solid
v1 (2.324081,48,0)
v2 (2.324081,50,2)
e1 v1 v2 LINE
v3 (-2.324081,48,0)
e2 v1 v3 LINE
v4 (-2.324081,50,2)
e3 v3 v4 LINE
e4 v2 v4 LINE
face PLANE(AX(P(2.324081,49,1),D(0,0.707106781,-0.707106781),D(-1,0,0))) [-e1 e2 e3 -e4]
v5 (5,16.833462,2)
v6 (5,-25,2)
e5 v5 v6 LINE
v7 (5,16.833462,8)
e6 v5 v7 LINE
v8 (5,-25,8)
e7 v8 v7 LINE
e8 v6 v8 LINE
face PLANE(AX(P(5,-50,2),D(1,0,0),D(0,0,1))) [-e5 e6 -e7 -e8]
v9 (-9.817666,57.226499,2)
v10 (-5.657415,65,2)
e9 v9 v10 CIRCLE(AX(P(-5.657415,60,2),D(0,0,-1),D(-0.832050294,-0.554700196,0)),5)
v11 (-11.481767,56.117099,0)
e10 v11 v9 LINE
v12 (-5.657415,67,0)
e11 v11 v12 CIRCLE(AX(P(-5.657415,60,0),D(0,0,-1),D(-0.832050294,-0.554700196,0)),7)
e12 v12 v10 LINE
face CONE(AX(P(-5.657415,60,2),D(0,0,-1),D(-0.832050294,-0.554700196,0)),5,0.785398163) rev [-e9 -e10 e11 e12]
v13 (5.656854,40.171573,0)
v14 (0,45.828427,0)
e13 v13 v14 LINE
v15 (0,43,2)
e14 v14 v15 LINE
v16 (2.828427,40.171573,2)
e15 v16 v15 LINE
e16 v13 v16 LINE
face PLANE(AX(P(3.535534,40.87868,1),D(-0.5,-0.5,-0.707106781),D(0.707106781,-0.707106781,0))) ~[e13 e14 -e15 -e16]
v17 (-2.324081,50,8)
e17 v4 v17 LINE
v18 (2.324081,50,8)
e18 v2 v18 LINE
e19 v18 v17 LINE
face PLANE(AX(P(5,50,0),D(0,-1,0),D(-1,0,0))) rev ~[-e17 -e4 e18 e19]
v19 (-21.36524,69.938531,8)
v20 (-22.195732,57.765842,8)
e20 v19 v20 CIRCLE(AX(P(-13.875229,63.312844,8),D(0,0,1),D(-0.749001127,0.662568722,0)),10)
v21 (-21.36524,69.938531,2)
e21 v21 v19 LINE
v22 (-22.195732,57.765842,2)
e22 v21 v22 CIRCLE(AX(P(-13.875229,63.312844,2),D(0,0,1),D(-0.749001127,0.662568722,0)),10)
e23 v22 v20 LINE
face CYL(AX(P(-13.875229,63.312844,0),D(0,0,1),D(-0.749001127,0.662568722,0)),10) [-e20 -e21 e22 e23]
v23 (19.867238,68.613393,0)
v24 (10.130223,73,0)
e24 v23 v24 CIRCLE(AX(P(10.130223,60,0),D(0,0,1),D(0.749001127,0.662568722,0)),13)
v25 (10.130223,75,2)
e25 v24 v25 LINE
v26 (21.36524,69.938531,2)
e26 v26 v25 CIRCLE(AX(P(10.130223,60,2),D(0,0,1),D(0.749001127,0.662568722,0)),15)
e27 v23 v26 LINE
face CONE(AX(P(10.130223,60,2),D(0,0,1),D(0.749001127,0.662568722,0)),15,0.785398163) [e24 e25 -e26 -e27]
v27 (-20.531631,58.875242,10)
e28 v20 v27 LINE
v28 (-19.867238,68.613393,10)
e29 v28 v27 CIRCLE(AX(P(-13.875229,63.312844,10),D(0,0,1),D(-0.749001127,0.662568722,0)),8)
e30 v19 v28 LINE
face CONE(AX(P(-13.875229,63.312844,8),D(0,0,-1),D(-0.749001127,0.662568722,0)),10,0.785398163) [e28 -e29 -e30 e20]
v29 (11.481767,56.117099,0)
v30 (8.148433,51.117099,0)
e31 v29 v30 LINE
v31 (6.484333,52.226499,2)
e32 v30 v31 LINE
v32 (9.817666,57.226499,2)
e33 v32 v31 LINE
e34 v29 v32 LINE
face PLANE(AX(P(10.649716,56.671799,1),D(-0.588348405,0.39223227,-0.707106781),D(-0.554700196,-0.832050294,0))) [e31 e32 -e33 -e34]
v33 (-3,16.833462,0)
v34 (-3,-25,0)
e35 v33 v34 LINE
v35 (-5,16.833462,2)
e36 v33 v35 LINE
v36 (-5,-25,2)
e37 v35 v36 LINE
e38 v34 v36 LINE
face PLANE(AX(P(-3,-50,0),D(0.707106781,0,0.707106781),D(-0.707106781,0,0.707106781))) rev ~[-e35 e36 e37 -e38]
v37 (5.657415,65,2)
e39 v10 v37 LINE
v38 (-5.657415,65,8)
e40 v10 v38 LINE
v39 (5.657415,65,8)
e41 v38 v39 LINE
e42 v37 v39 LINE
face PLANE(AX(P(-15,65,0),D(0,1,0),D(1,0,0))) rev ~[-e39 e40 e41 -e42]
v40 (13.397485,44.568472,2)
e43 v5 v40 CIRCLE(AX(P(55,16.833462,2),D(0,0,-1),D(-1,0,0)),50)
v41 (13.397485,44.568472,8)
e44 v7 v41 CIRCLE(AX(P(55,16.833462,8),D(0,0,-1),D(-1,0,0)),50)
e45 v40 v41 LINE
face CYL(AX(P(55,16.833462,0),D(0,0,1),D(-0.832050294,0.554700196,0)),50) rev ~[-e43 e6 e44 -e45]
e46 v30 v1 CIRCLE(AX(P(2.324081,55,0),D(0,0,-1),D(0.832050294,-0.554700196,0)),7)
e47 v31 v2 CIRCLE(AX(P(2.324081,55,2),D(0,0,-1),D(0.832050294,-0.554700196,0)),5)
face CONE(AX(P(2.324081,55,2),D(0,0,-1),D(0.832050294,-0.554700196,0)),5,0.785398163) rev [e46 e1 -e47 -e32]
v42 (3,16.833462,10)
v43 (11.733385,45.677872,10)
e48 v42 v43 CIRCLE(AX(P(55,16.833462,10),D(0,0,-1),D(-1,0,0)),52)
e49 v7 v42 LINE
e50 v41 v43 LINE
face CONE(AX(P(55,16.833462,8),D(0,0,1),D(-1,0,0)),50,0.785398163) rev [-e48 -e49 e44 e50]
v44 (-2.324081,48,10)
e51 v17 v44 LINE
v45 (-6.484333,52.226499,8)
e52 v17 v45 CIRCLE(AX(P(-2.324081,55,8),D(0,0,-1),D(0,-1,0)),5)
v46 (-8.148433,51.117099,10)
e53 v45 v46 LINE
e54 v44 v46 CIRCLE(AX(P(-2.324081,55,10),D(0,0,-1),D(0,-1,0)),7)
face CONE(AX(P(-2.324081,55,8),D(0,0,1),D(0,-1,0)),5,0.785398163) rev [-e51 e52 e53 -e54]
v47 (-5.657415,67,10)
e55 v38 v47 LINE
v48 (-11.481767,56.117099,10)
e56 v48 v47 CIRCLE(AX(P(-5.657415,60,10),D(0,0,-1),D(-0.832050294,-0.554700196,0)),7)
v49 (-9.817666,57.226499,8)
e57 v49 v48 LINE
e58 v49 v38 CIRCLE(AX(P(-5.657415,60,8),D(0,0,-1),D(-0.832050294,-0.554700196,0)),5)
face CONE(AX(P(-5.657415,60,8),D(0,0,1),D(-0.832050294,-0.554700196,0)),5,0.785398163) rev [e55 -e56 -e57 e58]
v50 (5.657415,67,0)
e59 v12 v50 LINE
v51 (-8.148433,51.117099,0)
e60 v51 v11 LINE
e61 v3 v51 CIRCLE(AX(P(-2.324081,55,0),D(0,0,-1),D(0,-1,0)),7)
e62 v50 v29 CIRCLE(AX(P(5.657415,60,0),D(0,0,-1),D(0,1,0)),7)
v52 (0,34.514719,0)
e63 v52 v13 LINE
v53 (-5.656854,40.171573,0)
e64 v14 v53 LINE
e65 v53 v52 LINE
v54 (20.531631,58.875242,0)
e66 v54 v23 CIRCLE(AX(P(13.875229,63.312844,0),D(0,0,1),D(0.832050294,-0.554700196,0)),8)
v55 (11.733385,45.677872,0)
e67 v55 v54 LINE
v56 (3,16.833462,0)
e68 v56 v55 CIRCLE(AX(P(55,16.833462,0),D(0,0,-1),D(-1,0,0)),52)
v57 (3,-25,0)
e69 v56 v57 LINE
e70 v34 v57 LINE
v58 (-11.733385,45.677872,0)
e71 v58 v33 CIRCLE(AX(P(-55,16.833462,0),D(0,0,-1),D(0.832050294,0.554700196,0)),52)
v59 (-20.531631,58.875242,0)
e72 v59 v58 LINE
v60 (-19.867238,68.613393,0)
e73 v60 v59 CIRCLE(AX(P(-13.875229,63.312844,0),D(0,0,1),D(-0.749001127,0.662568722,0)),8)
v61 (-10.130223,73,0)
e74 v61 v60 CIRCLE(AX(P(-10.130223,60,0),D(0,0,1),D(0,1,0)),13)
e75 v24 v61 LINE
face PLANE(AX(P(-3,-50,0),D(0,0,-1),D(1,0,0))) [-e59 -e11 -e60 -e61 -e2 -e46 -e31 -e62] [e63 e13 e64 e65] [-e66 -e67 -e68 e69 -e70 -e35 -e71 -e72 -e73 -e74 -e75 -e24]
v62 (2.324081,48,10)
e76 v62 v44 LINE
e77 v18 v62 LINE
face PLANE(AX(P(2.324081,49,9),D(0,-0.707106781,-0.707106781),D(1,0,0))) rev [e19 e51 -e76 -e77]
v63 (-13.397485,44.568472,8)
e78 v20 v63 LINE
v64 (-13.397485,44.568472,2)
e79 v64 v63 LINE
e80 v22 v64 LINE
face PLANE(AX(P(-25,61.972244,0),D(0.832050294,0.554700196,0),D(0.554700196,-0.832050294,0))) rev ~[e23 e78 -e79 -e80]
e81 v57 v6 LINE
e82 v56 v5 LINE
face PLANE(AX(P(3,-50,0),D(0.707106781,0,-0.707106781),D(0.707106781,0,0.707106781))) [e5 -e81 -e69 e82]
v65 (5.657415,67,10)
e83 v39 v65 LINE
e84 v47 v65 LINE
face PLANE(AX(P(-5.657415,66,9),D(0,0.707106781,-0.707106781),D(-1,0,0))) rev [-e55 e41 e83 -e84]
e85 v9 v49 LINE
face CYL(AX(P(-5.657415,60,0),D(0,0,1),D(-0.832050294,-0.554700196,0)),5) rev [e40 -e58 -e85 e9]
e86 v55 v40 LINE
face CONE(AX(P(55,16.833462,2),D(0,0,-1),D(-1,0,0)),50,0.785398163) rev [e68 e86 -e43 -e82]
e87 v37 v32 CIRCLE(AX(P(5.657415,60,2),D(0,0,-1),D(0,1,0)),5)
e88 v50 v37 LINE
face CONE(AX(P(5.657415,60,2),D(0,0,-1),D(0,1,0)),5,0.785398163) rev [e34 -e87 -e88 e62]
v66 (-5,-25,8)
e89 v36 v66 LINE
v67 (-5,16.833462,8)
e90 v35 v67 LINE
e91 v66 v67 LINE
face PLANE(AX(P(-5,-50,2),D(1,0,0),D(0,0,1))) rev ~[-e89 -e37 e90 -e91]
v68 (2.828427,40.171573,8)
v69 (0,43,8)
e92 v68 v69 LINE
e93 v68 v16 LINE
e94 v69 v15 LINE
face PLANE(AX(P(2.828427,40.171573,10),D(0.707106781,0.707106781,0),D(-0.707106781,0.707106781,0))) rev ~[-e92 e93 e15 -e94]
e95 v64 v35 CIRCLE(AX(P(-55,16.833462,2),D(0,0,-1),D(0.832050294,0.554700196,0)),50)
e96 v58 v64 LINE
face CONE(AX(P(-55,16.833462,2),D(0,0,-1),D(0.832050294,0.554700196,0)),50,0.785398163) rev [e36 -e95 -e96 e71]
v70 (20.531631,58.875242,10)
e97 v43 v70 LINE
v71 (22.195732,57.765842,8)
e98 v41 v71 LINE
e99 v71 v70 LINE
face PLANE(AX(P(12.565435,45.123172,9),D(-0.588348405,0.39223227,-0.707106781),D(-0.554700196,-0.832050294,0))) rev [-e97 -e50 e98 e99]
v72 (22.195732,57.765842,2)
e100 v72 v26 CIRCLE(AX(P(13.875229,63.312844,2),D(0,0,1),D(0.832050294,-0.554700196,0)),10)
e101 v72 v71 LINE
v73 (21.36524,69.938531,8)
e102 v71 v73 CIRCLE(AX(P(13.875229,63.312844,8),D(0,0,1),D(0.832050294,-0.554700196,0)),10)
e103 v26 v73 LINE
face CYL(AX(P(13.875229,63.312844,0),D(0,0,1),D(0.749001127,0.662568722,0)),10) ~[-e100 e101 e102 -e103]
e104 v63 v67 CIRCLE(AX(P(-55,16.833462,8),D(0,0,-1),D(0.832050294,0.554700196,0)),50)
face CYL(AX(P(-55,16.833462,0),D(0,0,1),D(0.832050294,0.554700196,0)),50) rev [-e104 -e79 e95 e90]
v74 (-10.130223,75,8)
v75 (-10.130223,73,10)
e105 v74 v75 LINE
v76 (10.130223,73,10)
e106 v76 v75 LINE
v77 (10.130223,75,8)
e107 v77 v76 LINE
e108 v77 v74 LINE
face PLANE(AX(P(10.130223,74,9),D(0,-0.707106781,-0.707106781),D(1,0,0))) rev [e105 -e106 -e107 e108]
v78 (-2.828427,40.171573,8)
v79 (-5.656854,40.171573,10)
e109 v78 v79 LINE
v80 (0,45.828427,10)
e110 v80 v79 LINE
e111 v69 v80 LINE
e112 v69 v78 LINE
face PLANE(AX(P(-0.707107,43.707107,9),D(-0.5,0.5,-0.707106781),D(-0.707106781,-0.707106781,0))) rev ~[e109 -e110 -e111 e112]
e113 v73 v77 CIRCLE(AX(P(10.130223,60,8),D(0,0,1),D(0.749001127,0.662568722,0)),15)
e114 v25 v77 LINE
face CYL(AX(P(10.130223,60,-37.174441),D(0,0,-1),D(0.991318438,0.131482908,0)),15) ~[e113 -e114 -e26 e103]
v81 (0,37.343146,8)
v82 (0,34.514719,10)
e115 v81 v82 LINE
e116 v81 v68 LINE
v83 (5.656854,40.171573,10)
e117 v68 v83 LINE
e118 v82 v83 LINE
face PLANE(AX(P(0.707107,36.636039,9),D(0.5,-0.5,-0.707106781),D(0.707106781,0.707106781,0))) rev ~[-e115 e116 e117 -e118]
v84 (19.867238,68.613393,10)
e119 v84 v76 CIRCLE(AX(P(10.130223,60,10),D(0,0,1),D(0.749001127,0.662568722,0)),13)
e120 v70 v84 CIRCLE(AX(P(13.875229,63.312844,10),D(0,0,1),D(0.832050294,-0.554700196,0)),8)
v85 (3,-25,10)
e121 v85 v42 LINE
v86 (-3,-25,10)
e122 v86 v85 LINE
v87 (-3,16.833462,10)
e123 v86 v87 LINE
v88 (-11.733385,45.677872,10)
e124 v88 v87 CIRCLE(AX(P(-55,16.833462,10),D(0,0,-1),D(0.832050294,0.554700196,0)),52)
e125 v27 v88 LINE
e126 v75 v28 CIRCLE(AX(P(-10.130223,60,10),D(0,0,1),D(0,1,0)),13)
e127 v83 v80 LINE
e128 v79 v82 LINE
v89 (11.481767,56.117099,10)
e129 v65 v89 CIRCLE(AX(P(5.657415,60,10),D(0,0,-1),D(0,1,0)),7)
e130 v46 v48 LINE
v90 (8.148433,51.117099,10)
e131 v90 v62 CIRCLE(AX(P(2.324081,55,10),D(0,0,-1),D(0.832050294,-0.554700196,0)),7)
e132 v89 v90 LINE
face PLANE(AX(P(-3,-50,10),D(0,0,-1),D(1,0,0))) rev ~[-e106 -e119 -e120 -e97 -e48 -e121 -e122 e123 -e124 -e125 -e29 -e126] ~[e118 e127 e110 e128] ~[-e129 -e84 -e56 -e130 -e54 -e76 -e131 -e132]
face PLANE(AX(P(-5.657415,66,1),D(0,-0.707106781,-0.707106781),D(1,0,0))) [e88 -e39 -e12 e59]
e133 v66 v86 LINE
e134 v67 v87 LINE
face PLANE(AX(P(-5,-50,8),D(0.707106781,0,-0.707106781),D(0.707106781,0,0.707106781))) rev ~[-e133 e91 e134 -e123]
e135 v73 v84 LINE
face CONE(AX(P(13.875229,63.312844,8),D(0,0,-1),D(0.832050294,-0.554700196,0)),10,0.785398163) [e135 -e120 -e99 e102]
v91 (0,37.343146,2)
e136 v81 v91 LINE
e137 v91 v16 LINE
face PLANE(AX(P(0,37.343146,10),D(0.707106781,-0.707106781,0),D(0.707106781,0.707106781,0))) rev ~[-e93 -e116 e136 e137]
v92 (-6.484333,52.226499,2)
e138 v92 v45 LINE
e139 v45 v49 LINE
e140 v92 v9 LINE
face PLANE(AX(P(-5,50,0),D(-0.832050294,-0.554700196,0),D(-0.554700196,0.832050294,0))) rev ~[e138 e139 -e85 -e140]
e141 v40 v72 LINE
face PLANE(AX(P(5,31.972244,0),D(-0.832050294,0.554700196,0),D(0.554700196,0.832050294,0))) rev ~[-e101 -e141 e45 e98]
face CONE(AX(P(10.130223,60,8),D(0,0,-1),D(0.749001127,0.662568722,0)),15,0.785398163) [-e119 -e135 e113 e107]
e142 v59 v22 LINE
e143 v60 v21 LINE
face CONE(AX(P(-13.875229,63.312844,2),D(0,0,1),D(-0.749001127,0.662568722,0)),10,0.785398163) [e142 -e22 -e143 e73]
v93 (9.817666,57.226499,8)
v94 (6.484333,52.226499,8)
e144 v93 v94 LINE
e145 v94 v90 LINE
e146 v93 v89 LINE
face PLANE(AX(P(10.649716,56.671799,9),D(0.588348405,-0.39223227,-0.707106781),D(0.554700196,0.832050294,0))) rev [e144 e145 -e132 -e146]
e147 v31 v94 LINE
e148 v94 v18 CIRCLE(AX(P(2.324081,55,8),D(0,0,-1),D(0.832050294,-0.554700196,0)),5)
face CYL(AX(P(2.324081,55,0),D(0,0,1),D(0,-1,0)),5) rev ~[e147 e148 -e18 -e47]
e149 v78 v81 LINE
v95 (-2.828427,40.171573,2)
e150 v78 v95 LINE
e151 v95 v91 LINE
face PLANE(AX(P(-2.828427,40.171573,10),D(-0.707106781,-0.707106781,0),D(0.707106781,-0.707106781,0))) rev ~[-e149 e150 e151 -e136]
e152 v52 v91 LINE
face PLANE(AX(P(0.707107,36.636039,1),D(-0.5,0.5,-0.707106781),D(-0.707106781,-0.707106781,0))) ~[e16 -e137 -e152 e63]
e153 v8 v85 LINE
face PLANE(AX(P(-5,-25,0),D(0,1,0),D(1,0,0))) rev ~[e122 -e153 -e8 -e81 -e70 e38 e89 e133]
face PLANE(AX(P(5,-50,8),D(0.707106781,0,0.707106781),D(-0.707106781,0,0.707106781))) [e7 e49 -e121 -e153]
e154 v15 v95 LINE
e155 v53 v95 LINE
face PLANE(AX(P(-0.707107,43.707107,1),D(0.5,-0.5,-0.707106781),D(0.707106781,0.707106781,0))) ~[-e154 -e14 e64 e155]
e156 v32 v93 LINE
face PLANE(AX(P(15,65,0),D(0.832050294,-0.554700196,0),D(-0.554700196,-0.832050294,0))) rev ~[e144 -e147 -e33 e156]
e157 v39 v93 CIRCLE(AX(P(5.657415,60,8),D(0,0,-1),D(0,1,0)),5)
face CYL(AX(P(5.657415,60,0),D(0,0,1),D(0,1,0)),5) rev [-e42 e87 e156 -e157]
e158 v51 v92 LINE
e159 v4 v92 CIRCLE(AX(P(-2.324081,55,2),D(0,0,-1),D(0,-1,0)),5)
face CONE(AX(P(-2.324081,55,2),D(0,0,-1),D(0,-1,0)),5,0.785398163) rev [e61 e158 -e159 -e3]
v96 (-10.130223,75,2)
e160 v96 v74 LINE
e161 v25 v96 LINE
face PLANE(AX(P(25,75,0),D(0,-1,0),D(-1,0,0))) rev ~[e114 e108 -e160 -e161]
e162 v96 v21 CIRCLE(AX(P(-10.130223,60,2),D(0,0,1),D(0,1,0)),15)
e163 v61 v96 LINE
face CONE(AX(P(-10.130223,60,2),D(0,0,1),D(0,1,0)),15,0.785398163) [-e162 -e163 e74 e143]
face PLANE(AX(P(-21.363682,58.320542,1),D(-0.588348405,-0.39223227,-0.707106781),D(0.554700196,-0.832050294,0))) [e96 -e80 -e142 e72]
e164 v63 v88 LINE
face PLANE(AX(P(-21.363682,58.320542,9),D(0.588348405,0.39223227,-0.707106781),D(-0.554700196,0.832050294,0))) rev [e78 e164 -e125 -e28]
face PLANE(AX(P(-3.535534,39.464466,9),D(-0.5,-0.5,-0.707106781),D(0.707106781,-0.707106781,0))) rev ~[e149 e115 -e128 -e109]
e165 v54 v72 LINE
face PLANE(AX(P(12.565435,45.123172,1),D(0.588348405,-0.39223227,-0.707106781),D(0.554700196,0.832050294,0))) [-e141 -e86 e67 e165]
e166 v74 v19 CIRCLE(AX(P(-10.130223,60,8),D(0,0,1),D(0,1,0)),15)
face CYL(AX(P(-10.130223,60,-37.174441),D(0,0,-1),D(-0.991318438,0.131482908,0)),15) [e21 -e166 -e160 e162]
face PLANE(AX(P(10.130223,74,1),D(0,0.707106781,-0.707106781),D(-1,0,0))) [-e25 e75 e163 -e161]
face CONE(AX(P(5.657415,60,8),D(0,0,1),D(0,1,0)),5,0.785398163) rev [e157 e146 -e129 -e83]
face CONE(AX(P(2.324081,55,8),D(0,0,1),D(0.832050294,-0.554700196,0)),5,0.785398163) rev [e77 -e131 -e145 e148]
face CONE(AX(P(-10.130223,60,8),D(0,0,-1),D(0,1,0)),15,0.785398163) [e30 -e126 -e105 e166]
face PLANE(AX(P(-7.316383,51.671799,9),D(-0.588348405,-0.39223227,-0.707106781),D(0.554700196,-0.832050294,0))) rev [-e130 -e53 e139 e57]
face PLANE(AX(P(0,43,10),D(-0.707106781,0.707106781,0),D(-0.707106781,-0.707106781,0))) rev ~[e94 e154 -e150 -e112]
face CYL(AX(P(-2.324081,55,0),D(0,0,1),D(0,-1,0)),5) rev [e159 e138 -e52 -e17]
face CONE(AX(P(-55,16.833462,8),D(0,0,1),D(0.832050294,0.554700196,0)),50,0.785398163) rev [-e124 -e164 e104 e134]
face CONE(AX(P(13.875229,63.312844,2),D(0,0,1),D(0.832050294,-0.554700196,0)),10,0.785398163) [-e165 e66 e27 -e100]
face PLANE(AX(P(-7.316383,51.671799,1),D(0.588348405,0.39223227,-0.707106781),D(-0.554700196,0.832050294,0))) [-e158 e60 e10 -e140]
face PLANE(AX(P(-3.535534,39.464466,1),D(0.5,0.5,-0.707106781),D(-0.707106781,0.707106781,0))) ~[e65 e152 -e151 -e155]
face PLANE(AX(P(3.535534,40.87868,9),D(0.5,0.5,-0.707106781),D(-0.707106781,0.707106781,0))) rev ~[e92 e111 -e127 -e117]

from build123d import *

# Parameters (mm, degrees)
F0_W        = 30
F0_H        = 10
F1_DEPTH    = 10
F2_R        = 5
F3_T1_DEPTH = 84.348882825
F4_R        = 10
F5_R        = 50
F6_SIZE     = 2
F8_DEPTH    = 10.001
F9_SIZE     = 2
F10_DEPTH   = 16
F11_DEPTH   = 25


# Not quite as in the source:
# - a fillet or chamfer that OpenCascade refuses, or shapes differently, is made with other operations: its cross-section is extruded or revolved along the edge and cut away or added


with BuildPart() as f1:
    # F0 (on Top) → F1 (new body)
    with BuildSketch(Plane.XY):
        Polygon((5, 50), (-5, 50), (-15, 65), (-15, 75), (-25, 75), (-25, 61.9722436227), (-5, 31.9722436227), (-5, -50), (5, -50), (5, 31.9722436227), (25, 61.9722436227), (25, 75), (15, 75), (15, 65), align=None)
        with Locations((0, 70)):
            Rectangle(F0_W, F0_H)
    extrude(amount=F1_DEPTH)

    # F2
    f2_edges = [f1.edges().sort_by_distance(p)[0] for p in [
        (15, 65, 5),
        (-15, 65, 5),
        (-5, 50, 5),
        (5, 50, 5),
    ]]
    fillet(f2_edges, radius=F2_R)

    # F3: fillet of radius 15 on 2 edges, made by hand

    # F3_s2 → F3_t1 (cut)
    with BuildSketch(Plane.XY.offset(-37.1744414125)):
        with BuildLine():
            ThreePointArc((-25, 61.9722436227), (-20.0149678844, 71.2823679771), (-10.130223435, 75))
            Line((-10.130223435, 75), (-25, 75))
            Line((-25, 75), (-25, 61.9722436227))
        make_face()
        with BuildLine():
            ThreePointArc((25, 61.9722436227), (20.0149678844, 71.2823679771), (10.130223435, 75))
            Line((10.130223435, 75), (25, 75))
            Line((25, 75), (25, 61.9722436227))
        make_face()
    extrude(amount=F3_T1_DEPTH, mode=Mode.SUBTRACT)

    # F4
    f4_edges = [f1.edges().sort_by_distance(p)[0] for p in [
        (-25, 61.972244, 5),
        (25, 61.972244, 5),
    ]]
    fillet(f4_edges, radius=F4_R)

    # F5
    f5_edges = [f1.edges().sort_by_distance(p)[0] for p in [
        (5, 31.972244, 5),
        (-5, 31.972244, 5),
    ]]
    fillet(f5_edges, radius=F5_R)

    # F6
    f6_edges = [f1.edges().sort_by_distance(p)[0] for p in [
        (0, 65, 10),
        (0, 75, 10),
        (0, 50, 0),
        (0, 75, 0),
    ]]
    chamfer(f6_edges, length=F6_SIZE)

    # F7 (on face) → F8 (cut, through all)
    with BuildSketch(Plane.XY.offset(10)):
        Polygon((0, 37.3431457505), (2.8284271247, 40.1715728753), (0, 43), (-2.8284271247, 40.1715728753), align=None)
    extrude(amount=-F8_DEPTH, mode=Mode.SUBTRACT)

    # F9
    f9_edges = [f1.edges().sort_by_distance(p)[0] for p in [
        (1.414214, 41.585786, 10),
        (-1.414214, 41.585786, 10),
        (1.414214, 38.757359, 10),
        (-1.414214, 38.757359, 10),
        (1.414214, 38.757359, 0),
        (1.414214, 41.585786, 0),
        (-1.414214, 41.585786, 0),
        (-1.414214, 38.757359, 0),
    ]]
    chamfer(f9_edges, length=F9_SIZE)

    # F10 (add): a face of the model
    f10_faces = [f1.faces().sort_by_distance(p)[0] for p in [
        (0, -50, 5),
    ]]
    extrude(f10_faces, amount=-F10_DEPTH)

    # F11 (cut): a face of the model
    f11_faces = [f1.faces().sort_by_distance(p)[0] for p in [
        (0, -50, 5),
    ]]
    extrude(f11_faces, amount=-F11_DEPTH, mode=Mode.SUBTRACT)


solid = f1.part
